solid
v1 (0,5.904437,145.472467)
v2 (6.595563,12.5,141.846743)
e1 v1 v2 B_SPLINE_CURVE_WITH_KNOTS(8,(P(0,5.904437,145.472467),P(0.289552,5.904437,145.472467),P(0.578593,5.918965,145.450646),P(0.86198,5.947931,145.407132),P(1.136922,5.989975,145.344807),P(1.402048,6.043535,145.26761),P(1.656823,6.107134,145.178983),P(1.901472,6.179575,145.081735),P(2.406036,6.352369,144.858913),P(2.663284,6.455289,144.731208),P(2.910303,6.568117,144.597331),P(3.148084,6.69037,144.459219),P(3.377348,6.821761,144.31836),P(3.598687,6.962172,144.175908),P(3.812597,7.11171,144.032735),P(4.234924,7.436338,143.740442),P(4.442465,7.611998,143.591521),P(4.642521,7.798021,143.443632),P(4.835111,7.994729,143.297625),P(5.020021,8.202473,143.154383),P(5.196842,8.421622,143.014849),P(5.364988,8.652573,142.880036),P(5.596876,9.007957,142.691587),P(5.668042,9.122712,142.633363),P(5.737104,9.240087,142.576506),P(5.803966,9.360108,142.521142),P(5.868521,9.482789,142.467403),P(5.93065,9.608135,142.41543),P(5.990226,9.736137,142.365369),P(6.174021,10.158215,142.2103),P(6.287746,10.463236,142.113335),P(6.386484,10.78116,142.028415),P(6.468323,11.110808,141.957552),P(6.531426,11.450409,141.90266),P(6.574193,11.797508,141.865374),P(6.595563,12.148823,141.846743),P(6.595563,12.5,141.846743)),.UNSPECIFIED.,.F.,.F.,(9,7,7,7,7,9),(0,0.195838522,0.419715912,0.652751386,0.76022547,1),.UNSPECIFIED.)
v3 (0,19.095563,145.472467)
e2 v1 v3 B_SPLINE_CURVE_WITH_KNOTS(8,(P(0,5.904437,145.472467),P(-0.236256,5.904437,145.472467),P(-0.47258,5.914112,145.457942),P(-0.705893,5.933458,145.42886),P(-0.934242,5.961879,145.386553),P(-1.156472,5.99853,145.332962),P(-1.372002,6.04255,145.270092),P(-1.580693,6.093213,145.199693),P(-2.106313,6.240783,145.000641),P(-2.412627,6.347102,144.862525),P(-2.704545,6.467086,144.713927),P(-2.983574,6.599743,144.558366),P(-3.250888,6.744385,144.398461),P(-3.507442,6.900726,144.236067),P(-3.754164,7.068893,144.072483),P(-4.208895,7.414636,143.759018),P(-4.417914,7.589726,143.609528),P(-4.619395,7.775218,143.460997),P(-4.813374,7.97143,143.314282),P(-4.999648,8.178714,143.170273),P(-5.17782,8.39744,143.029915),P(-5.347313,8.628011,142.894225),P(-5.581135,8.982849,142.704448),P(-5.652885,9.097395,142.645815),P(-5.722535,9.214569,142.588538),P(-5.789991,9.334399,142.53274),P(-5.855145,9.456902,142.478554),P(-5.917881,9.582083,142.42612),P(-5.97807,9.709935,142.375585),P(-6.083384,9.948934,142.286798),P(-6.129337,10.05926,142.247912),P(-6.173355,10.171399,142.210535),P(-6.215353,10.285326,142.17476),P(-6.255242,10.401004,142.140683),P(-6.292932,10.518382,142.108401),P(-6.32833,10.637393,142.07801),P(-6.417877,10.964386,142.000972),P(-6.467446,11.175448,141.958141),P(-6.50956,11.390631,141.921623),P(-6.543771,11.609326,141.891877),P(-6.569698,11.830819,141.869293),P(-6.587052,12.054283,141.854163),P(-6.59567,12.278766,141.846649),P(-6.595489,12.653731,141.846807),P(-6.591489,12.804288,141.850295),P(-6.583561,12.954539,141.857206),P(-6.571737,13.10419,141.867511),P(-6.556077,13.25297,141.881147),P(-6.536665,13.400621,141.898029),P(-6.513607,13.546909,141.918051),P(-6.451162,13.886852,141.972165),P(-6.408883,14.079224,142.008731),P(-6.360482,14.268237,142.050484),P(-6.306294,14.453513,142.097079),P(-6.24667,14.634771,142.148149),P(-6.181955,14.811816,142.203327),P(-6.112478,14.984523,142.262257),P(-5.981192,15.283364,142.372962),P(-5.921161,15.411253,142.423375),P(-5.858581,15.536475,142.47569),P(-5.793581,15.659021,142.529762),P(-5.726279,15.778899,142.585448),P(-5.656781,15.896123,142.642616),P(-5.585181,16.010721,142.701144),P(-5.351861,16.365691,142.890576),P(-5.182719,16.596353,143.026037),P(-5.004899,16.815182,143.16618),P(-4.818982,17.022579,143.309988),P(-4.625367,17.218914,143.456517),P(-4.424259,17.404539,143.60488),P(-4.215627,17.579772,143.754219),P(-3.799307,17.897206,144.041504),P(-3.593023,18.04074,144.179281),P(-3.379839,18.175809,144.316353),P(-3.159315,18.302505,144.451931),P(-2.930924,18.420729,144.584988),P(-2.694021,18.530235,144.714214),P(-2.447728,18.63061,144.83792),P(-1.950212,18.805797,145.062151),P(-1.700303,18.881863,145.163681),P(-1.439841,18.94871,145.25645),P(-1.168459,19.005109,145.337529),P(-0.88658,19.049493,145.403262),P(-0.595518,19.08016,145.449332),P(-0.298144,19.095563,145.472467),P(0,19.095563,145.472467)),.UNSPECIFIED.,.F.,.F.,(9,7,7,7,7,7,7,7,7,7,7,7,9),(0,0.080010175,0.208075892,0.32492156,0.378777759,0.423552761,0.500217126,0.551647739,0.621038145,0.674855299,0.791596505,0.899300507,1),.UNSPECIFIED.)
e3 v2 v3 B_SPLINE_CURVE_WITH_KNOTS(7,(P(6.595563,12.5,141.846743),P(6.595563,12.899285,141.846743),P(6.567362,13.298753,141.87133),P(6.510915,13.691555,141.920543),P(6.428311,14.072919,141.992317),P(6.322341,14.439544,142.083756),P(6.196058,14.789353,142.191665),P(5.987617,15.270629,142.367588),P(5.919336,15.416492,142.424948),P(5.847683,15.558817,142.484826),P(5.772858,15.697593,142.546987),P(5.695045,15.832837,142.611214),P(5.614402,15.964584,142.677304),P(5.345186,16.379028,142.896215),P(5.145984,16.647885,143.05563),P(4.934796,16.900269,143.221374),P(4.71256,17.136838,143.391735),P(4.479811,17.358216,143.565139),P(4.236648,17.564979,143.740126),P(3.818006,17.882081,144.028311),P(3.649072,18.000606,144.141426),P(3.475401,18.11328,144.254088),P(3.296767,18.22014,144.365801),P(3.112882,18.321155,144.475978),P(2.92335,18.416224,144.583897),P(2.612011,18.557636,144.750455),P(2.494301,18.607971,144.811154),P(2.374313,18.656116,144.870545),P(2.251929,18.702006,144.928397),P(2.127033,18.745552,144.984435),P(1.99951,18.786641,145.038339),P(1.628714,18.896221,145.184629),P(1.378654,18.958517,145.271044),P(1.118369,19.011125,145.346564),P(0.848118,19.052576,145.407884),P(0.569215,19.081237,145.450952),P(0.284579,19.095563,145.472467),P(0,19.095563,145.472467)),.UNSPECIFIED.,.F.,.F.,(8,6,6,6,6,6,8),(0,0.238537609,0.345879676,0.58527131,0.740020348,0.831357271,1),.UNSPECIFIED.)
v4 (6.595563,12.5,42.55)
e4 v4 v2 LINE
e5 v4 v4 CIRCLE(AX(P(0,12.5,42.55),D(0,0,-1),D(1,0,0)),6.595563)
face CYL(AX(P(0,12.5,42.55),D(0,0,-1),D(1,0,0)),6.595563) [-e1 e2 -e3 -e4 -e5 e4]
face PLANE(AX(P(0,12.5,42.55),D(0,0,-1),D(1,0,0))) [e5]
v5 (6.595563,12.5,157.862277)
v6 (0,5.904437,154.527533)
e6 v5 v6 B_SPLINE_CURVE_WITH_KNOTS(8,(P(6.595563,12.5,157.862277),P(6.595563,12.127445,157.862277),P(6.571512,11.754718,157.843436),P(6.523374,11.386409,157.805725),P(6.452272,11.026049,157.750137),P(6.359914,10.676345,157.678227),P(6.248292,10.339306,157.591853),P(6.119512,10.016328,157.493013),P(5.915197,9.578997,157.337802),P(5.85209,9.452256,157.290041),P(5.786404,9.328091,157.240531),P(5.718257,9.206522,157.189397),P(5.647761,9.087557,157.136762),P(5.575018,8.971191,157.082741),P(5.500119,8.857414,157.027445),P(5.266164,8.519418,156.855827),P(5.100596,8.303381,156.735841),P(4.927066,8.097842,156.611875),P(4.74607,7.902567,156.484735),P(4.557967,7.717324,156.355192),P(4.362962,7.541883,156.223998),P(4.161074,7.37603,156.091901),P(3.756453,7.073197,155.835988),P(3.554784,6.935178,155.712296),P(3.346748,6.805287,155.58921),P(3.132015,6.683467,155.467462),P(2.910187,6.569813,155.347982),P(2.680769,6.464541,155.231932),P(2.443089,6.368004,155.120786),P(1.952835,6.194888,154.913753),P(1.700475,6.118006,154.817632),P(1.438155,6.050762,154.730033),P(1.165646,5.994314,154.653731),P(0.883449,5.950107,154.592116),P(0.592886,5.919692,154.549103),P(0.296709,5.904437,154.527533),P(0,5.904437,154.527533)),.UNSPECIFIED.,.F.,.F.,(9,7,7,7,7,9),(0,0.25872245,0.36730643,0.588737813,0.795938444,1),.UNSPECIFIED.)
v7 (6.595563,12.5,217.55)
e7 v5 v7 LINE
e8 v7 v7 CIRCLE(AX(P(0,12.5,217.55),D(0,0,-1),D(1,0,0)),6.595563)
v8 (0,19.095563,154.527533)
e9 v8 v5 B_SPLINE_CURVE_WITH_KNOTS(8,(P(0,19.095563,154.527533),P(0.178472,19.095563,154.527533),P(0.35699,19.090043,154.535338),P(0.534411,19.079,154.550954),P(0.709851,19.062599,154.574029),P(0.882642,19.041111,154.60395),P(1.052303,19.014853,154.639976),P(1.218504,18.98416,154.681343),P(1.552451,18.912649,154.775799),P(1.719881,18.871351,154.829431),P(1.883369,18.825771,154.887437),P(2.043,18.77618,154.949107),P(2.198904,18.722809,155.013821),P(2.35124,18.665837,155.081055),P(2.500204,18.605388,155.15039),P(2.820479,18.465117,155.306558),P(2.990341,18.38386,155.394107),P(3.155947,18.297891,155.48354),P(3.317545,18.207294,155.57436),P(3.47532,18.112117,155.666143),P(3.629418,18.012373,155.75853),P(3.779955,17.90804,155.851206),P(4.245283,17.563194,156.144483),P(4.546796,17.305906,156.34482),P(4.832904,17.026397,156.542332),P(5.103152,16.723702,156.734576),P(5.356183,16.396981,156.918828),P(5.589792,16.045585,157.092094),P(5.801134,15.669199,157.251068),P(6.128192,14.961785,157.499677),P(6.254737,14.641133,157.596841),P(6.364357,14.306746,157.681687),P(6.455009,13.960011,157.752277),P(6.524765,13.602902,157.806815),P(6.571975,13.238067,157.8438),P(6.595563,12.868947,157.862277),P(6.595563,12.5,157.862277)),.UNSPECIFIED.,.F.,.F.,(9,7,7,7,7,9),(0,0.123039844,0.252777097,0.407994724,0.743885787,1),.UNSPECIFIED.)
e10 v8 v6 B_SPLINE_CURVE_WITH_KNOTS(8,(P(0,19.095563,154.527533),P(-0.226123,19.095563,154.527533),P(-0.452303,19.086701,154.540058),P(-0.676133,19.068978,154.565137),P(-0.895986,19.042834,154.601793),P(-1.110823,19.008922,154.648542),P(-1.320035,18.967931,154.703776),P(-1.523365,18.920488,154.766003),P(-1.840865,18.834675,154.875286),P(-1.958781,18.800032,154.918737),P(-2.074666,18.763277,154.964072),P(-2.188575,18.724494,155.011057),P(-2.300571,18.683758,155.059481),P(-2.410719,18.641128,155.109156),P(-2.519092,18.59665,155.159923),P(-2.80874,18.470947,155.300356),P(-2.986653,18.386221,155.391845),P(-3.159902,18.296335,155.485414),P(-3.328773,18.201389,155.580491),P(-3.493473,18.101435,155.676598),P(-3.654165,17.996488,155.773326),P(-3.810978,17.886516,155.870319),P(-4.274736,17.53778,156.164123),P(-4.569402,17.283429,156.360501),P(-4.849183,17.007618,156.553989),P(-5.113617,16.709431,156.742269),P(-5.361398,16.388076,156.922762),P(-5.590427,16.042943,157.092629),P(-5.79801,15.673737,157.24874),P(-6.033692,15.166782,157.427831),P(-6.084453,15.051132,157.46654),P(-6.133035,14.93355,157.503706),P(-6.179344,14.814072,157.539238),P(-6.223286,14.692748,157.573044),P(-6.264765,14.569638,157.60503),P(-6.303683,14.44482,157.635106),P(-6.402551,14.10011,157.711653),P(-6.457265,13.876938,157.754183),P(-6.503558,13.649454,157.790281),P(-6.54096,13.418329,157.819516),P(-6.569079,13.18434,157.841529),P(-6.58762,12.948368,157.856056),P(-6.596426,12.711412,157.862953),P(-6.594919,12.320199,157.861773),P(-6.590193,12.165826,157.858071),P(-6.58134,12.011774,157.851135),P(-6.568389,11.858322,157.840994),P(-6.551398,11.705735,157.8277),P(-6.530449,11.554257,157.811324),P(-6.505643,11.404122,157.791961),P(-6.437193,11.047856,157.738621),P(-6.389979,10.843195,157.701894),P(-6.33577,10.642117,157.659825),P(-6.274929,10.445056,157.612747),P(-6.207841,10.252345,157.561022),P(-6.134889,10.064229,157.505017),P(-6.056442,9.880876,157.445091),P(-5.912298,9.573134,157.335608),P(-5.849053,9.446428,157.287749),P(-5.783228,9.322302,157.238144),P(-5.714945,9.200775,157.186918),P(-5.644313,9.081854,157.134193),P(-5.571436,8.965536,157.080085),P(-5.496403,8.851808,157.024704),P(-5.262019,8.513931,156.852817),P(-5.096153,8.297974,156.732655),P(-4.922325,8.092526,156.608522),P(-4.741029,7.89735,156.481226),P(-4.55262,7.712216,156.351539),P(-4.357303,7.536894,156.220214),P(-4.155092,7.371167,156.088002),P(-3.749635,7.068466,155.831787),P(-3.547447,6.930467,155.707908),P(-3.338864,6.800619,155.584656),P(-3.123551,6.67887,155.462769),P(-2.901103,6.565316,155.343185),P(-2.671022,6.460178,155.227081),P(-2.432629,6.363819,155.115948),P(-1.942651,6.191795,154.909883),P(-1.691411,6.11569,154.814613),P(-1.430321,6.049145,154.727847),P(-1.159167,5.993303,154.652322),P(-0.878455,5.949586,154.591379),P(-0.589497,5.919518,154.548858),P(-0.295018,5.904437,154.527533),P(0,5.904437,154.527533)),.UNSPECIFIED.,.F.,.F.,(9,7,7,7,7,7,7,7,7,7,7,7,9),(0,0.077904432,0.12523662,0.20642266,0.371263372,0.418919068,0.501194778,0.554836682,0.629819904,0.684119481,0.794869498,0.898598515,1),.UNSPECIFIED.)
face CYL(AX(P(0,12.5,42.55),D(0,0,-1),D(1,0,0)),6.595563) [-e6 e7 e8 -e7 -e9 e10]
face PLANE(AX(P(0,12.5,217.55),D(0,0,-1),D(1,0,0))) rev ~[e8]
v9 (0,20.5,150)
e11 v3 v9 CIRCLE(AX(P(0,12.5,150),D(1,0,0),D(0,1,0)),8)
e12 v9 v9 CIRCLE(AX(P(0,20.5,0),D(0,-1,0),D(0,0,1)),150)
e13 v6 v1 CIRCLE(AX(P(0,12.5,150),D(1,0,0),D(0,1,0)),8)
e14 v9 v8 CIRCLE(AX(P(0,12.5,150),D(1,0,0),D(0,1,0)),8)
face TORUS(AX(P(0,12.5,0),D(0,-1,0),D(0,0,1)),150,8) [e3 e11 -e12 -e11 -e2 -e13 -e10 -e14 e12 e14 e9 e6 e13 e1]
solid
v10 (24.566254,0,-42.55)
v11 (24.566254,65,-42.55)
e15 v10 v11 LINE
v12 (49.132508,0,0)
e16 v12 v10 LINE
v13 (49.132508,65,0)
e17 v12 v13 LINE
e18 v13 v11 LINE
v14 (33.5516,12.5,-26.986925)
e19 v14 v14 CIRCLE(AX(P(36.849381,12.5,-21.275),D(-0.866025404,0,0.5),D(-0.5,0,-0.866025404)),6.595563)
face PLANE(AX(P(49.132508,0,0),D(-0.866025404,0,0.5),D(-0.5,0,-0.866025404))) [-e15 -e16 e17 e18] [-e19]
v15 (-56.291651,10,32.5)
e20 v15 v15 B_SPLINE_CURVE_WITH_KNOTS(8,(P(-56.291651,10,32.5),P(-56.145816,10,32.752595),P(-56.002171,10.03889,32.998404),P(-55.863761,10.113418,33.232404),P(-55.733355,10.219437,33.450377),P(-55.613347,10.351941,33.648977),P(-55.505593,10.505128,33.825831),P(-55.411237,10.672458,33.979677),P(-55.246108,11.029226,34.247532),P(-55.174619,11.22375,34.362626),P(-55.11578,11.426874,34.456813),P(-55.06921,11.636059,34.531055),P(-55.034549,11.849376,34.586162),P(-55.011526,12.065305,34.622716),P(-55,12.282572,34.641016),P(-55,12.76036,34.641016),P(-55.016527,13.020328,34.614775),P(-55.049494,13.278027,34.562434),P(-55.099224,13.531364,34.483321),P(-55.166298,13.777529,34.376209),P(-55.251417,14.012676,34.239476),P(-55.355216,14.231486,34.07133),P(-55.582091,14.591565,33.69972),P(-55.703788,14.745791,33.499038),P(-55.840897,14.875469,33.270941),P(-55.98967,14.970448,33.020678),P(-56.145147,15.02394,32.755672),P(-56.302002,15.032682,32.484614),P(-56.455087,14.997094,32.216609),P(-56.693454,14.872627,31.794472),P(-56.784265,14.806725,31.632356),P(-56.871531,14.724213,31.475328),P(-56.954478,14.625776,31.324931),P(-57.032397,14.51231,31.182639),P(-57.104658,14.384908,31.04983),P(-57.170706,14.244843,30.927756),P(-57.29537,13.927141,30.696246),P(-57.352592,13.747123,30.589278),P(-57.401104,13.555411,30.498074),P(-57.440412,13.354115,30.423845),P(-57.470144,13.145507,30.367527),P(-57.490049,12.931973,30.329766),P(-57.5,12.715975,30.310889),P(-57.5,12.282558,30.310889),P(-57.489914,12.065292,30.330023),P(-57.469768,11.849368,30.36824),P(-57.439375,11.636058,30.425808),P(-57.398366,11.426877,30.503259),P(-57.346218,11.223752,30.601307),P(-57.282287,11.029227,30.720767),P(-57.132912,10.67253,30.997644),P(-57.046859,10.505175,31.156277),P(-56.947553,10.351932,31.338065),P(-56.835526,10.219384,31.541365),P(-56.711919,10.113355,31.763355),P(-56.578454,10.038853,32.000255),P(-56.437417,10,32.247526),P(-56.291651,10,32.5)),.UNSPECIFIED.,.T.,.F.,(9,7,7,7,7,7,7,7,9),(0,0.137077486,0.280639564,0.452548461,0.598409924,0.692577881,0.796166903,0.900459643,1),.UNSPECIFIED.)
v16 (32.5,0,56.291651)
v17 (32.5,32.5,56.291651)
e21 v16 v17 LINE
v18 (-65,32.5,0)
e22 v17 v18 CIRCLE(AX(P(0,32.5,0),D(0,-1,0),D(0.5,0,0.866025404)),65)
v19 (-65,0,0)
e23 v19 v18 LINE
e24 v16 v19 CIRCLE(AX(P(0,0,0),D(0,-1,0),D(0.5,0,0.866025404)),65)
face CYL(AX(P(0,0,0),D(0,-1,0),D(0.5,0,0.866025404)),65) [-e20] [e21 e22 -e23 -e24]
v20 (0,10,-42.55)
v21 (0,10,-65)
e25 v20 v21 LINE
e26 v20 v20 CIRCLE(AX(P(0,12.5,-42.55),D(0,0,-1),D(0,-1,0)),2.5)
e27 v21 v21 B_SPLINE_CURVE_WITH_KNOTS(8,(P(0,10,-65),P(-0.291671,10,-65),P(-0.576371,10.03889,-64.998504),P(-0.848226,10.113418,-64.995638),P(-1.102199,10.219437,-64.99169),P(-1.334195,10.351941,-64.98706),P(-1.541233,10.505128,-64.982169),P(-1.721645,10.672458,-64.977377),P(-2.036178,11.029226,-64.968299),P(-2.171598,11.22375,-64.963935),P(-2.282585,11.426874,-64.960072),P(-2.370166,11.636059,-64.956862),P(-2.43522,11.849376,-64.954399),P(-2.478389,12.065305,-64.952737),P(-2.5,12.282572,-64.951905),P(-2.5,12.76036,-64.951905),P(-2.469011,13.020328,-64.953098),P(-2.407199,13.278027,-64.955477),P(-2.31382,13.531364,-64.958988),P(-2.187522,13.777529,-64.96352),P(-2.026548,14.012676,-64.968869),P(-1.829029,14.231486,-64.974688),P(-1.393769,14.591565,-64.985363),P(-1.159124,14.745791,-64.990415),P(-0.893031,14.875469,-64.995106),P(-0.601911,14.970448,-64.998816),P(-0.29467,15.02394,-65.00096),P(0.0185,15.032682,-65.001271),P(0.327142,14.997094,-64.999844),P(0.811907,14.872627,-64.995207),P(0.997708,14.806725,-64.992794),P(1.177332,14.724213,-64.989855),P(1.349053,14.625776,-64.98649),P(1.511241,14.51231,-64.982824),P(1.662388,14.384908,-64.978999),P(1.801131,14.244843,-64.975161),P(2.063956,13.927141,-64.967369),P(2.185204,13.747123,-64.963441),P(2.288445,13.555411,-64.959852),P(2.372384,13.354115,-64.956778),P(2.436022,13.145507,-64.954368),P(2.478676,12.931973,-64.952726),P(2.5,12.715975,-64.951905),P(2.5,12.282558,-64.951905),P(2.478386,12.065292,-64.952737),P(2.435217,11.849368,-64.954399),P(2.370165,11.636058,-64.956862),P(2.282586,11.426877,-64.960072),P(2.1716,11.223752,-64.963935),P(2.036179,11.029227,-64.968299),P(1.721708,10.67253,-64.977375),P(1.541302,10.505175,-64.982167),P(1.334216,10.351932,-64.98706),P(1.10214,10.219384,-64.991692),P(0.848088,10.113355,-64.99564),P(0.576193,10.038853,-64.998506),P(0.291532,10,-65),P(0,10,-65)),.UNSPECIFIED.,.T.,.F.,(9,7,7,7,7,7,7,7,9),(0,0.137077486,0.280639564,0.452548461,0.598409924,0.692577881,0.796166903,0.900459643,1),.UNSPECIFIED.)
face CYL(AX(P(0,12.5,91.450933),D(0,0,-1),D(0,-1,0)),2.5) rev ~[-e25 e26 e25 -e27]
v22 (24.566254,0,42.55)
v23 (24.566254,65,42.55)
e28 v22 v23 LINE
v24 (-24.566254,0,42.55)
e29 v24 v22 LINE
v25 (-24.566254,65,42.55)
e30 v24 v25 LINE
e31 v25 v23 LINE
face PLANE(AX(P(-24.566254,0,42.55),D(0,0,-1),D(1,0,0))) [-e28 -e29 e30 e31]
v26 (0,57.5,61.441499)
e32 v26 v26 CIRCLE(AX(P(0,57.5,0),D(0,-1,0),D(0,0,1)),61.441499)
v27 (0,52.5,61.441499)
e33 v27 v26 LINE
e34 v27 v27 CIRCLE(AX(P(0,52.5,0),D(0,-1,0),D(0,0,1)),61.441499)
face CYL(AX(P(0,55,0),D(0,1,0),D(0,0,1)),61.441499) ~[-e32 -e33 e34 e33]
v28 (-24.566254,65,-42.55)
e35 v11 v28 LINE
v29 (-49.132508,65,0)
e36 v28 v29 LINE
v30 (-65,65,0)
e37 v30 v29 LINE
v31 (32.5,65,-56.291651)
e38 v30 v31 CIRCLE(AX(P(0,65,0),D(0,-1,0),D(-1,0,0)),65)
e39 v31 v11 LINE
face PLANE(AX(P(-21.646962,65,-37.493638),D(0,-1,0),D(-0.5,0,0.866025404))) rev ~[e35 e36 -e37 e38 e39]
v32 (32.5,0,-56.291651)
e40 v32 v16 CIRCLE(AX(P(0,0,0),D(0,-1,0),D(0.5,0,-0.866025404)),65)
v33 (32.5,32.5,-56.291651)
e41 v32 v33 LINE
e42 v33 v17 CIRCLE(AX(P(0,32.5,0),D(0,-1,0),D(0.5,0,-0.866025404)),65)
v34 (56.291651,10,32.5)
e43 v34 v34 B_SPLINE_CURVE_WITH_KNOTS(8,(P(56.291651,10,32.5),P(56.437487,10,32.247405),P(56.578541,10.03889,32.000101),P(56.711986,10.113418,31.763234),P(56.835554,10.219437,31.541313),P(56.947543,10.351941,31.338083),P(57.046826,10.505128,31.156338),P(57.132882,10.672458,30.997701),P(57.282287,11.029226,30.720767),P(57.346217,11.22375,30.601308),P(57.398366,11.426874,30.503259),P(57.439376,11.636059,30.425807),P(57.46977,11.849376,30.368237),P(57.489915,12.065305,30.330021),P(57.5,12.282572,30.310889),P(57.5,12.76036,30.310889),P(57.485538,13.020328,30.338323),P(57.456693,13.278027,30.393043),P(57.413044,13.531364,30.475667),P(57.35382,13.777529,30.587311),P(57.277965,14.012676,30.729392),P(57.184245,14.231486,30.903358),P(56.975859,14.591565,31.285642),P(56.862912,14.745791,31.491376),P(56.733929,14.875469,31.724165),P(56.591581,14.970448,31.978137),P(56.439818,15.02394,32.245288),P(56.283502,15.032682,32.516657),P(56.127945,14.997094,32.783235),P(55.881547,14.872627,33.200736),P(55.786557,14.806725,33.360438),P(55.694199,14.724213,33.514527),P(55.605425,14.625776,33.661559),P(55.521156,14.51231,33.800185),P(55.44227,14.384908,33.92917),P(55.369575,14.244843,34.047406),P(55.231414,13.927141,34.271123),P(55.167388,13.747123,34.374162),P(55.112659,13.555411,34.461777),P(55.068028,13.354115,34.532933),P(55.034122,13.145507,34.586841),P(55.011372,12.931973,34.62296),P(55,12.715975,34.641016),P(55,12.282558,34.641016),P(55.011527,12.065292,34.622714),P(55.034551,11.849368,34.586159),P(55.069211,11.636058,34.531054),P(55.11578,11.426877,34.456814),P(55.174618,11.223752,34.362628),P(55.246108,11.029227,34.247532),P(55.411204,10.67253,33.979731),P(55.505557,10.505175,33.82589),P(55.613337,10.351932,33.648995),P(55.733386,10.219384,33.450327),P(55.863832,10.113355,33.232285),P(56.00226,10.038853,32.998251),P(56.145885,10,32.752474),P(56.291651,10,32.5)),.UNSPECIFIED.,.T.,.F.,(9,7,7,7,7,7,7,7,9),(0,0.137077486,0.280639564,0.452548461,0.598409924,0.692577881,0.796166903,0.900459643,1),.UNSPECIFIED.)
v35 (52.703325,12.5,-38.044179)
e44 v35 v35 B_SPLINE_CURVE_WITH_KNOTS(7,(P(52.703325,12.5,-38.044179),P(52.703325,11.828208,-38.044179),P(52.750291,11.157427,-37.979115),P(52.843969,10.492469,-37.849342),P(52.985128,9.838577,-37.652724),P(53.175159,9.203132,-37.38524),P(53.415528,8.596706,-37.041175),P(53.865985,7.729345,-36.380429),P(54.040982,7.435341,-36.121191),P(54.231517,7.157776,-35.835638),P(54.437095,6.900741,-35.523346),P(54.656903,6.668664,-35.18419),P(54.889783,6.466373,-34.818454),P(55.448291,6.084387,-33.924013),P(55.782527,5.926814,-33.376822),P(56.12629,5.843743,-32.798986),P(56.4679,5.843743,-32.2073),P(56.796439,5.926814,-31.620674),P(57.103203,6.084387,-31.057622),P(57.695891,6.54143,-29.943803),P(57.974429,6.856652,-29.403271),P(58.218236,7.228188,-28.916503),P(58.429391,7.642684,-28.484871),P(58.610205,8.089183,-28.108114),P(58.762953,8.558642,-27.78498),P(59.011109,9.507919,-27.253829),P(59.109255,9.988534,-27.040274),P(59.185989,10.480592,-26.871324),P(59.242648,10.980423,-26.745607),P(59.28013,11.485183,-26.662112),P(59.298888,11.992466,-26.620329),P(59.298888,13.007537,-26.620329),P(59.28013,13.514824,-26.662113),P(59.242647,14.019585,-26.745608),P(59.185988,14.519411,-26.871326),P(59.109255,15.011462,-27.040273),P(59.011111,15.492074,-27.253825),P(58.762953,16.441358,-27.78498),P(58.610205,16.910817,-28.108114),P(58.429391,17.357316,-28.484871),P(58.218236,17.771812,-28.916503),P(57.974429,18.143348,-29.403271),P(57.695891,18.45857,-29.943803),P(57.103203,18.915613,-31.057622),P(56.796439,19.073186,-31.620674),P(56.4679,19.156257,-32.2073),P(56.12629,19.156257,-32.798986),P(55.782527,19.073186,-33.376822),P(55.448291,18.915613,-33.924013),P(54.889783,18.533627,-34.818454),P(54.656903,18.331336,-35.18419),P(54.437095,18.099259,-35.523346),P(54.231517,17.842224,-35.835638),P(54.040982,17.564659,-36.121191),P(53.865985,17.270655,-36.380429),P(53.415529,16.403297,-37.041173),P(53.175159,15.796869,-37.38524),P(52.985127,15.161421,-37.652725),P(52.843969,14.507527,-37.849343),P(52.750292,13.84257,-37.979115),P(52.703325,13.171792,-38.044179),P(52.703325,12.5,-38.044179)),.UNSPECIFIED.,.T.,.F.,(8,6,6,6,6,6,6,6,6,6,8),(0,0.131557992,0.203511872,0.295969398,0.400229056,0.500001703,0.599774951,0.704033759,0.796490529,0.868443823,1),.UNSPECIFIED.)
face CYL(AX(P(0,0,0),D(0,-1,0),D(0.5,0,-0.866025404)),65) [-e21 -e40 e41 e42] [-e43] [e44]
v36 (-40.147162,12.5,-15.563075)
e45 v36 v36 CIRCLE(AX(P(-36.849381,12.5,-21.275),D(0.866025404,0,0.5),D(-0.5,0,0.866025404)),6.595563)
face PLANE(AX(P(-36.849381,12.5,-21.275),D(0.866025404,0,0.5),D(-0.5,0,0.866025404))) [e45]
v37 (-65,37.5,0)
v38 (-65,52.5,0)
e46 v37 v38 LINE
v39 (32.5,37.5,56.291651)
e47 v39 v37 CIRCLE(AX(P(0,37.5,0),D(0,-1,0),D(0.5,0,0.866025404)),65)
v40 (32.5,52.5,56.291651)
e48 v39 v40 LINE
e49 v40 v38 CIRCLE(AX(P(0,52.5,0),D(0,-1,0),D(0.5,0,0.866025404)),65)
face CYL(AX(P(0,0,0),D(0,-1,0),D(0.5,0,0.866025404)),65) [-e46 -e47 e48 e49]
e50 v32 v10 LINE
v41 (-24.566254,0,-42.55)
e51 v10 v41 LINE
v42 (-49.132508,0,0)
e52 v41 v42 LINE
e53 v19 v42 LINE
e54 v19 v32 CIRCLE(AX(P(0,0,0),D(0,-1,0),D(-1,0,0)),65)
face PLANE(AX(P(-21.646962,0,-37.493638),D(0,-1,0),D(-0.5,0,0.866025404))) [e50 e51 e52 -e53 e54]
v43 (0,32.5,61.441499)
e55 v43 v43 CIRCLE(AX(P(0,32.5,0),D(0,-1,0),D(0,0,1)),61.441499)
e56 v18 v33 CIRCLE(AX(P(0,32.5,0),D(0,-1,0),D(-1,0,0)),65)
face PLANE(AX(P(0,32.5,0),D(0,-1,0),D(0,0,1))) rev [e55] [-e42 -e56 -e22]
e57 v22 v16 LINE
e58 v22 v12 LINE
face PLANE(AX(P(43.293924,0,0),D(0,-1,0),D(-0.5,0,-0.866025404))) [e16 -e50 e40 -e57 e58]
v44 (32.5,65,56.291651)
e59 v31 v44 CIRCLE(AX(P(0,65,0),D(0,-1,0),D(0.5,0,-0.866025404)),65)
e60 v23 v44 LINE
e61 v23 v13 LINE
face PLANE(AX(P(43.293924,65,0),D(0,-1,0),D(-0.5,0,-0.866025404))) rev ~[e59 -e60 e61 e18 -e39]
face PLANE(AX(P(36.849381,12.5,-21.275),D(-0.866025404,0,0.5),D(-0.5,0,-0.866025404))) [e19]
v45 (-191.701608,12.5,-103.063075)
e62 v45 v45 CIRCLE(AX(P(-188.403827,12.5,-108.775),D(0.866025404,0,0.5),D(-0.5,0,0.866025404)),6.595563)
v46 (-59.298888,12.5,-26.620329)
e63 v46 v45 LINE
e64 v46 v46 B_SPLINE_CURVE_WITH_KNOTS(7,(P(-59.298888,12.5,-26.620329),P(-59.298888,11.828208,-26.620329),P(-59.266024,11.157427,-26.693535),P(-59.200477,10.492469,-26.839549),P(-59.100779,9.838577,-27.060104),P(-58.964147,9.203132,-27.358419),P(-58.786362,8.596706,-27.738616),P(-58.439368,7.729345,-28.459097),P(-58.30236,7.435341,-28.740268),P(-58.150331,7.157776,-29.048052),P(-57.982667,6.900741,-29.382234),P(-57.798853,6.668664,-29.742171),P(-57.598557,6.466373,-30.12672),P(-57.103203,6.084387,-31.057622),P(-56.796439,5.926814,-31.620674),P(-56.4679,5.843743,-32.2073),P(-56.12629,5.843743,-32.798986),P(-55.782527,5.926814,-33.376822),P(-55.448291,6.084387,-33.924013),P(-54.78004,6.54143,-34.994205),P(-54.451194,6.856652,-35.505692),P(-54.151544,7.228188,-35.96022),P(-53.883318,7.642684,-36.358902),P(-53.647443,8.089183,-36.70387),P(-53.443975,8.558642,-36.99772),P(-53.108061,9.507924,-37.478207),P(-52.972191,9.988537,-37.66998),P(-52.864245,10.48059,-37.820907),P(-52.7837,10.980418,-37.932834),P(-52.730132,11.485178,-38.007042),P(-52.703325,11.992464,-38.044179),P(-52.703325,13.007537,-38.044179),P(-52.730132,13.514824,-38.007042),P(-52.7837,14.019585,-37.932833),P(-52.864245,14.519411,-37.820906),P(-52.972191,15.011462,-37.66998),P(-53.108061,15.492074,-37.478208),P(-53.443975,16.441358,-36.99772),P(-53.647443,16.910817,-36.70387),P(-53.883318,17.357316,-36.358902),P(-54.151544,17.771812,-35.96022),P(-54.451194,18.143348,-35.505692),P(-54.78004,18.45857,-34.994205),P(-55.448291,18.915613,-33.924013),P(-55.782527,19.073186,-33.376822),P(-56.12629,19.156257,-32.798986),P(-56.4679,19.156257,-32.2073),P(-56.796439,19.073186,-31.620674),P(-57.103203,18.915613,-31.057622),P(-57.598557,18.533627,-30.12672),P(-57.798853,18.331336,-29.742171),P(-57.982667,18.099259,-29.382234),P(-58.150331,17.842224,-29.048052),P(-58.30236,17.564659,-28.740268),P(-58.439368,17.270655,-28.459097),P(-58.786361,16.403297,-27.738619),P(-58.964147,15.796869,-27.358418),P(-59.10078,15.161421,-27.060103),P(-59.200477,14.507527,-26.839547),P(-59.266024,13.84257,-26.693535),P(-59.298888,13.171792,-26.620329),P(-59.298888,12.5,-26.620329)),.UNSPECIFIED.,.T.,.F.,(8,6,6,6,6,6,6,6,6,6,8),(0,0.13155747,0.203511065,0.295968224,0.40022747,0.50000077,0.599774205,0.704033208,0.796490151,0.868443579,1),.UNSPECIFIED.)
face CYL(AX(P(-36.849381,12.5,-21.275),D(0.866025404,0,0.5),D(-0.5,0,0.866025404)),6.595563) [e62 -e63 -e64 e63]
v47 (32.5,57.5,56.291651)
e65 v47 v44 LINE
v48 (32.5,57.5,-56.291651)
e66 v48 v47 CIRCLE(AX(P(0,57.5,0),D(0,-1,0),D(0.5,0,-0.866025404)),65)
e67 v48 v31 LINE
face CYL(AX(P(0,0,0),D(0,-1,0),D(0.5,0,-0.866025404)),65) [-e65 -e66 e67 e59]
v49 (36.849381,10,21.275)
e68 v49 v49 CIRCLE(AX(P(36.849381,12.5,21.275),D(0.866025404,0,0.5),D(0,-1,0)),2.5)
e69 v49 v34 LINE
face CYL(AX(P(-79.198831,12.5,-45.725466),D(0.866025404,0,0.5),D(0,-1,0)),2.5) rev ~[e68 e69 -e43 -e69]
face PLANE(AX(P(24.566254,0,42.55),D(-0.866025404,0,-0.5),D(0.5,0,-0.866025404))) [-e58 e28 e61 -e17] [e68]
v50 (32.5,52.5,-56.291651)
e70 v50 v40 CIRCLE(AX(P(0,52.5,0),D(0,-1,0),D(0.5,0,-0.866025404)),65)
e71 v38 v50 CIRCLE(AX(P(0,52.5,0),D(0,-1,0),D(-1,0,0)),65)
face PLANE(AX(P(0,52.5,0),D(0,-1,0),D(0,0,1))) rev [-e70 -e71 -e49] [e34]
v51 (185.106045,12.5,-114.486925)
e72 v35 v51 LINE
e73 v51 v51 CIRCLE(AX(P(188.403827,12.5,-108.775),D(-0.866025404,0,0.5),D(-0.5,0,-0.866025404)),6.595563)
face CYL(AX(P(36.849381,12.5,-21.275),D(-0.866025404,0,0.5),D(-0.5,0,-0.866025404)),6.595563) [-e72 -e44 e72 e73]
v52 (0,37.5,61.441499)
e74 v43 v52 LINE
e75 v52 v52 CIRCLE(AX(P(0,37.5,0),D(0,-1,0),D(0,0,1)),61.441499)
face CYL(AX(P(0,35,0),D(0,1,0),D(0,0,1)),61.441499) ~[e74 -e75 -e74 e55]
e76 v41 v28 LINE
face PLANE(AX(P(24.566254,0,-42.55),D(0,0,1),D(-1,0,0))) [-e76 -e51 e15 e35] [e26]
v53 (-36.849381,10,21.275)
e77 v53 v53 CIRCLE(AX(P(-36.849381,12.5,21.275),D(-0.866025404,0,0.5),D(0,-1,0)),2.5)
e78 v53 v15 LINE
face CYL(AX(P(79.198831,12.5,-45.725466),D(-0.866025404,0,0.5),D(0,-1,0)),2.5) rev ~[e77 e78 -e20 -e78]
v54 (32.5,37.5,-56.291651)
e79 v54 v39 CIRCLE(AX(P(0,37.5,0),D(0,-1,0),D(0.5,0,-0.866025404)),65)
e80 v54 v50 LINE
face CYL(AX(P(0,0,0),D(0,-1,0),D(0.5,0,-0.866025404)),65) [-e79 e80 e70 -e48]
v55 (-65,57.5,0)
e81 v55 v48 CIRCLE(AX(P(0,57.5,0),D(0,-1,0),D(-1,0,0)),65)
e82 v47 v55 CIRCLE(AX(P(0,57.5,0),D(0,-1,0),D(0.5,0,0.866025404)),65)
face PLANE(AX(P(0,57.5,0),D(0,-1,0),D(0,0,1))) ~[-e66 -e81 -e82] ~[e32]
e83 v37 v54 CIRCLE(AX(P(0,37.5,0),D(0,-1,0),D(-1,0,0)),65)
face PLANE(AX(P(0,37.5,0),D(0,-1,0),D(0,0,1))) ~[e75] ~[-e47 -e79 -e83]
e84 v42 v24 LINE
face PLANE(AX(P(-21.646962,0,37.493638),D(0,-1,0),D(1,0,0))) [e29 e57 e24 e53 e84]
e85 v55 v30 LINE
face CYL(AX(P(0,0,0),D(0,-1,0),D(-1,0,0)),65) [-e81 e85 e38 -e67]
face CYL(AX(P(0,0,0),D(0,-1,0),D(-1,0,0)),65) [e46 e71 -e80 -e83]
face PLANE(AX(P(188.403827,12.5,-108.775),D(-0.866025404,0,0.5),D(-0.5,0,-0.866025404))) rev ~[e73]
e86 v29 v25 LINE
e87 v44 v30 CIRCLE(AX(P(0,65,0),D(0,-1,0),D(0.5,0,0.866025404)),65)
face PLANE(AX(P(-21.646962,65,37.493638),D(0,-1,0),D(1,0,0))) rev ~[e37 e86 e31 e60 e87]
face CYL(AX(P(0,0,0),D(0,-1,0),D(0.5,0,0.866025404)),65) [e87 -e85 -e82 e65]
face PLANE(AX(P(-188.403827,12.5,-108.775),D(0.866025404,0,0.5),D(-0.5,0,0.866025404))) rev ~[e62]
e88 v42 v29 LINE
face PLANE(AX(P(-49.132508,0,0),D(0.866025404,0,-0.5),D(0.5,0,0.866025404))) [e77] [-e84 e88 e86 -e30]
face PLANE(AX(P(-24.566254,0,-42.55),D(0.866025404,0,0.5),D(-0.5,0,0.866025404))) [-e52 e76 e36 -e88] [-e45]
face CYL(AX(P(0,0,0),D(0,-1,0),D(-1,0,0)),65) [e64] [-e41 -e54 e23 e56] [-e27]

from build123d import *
from build123d import SkipClean  # not in build123d's __all__

# Parameters (mm, degrees)
F1_DEPTH = 65
F3_D     = 5
F4_R     = 6.5955625586
F5_DEPTH = 175
F6_COUNT = 3
F7_W     = 5
F7_H     = 6.1170028751
F9_R     = 8


# Not quite as in the source:
# - a feature names something its author has since deleted; it is built from what else it names


with BuildPart() as f1:
    # F0 (on Front) → F1 (new body)
    with BuildSketch(Plane.XZ):
        with BuildLine():
            Line((-49.132507908, 0), (-24.566253954, 42.55))
            Line((-24.566253954, 42.55), (24.566253954, 42.55))
            Line((24.566253954, 42.55), (32.5, 56.291651246))
            ThreePointArc((32.5, 56.291651246), (-32.5, 56.291651246), (-65, 0))
            Line((-65, 0), (-49.132507908, 0))
        make_face()
    extrude(amount=-F1_DEPTH)

    # F3 (through all)
    with Locations(Plane(origin=(-36.849380931, 0, 21.275), x_dir=(0, 1, 0), z_dir=(0.8660254038, 0, -0.5))):
        with Locations((12.5, 0)):
            Hole(F3_D / 2)

    # F6: F5, F1 ×3 about axis
    f6_axis = Axis((0, 0, 0), (0, -1, 0))


with BuildPart() as f5:
    # F4 (on face) → F5 (new body)
    with BuildSketch(Plane(origin=(0, 0, 42.55), x_dir=(1, 0, 0), z_dir=(0, 0, -1))):
        with Locations((0, -12.5)):
            Circle(F4_R)
    extrude(amount=-F5_DEPTH)


with BuildPart() as f1_1:
    add(f1.part, clean=False)


with BuildPart() as f1_2:
    add(f1_1.part, clean=False)
    with SkipClean():  # cleaning this boolean's faces spoils the solid; the shape is the same uncleaned
        for i in range(1, F6_COUNT):
            add(f5.part.rotate(f6_axis, i * 360 / F6_COUNT), clean=False)
            add(f1_1.part.rotate(f6_axis, i * 360 / F6_COUNT), clean=False)

    # F7 (on Right) → F8 (revolve, cut)
    with BuildSketch(Plane.YZ):
        with Locations((55, 64.5)):
            Rectangle(F7_W, F7_H)
        with Locations((35, 64.5)):
            Rectangle(F7_W, F7_H)
    with SkipClean():  # cleaning this boolean's faces spoils the solid; the shape is the same uncleaned
        revolve(axis=Axis((0, 65, 0), (0, -1, 0)), mode=Mode.SUBTRACT)


with BuildPart() as f5_1:
    add(f5.part, clean=False)

    # F9 (on Right) → F10 (revolve)
    with BuildSketch(Plane.YZ):
        with Locations((12.5, 150)):
            Circle(F9_R)
    revolve(axis=Axis((0, 0, 0), (0, -1, 0)))


solid = Compound([f1_2.part, f5_1.part])
